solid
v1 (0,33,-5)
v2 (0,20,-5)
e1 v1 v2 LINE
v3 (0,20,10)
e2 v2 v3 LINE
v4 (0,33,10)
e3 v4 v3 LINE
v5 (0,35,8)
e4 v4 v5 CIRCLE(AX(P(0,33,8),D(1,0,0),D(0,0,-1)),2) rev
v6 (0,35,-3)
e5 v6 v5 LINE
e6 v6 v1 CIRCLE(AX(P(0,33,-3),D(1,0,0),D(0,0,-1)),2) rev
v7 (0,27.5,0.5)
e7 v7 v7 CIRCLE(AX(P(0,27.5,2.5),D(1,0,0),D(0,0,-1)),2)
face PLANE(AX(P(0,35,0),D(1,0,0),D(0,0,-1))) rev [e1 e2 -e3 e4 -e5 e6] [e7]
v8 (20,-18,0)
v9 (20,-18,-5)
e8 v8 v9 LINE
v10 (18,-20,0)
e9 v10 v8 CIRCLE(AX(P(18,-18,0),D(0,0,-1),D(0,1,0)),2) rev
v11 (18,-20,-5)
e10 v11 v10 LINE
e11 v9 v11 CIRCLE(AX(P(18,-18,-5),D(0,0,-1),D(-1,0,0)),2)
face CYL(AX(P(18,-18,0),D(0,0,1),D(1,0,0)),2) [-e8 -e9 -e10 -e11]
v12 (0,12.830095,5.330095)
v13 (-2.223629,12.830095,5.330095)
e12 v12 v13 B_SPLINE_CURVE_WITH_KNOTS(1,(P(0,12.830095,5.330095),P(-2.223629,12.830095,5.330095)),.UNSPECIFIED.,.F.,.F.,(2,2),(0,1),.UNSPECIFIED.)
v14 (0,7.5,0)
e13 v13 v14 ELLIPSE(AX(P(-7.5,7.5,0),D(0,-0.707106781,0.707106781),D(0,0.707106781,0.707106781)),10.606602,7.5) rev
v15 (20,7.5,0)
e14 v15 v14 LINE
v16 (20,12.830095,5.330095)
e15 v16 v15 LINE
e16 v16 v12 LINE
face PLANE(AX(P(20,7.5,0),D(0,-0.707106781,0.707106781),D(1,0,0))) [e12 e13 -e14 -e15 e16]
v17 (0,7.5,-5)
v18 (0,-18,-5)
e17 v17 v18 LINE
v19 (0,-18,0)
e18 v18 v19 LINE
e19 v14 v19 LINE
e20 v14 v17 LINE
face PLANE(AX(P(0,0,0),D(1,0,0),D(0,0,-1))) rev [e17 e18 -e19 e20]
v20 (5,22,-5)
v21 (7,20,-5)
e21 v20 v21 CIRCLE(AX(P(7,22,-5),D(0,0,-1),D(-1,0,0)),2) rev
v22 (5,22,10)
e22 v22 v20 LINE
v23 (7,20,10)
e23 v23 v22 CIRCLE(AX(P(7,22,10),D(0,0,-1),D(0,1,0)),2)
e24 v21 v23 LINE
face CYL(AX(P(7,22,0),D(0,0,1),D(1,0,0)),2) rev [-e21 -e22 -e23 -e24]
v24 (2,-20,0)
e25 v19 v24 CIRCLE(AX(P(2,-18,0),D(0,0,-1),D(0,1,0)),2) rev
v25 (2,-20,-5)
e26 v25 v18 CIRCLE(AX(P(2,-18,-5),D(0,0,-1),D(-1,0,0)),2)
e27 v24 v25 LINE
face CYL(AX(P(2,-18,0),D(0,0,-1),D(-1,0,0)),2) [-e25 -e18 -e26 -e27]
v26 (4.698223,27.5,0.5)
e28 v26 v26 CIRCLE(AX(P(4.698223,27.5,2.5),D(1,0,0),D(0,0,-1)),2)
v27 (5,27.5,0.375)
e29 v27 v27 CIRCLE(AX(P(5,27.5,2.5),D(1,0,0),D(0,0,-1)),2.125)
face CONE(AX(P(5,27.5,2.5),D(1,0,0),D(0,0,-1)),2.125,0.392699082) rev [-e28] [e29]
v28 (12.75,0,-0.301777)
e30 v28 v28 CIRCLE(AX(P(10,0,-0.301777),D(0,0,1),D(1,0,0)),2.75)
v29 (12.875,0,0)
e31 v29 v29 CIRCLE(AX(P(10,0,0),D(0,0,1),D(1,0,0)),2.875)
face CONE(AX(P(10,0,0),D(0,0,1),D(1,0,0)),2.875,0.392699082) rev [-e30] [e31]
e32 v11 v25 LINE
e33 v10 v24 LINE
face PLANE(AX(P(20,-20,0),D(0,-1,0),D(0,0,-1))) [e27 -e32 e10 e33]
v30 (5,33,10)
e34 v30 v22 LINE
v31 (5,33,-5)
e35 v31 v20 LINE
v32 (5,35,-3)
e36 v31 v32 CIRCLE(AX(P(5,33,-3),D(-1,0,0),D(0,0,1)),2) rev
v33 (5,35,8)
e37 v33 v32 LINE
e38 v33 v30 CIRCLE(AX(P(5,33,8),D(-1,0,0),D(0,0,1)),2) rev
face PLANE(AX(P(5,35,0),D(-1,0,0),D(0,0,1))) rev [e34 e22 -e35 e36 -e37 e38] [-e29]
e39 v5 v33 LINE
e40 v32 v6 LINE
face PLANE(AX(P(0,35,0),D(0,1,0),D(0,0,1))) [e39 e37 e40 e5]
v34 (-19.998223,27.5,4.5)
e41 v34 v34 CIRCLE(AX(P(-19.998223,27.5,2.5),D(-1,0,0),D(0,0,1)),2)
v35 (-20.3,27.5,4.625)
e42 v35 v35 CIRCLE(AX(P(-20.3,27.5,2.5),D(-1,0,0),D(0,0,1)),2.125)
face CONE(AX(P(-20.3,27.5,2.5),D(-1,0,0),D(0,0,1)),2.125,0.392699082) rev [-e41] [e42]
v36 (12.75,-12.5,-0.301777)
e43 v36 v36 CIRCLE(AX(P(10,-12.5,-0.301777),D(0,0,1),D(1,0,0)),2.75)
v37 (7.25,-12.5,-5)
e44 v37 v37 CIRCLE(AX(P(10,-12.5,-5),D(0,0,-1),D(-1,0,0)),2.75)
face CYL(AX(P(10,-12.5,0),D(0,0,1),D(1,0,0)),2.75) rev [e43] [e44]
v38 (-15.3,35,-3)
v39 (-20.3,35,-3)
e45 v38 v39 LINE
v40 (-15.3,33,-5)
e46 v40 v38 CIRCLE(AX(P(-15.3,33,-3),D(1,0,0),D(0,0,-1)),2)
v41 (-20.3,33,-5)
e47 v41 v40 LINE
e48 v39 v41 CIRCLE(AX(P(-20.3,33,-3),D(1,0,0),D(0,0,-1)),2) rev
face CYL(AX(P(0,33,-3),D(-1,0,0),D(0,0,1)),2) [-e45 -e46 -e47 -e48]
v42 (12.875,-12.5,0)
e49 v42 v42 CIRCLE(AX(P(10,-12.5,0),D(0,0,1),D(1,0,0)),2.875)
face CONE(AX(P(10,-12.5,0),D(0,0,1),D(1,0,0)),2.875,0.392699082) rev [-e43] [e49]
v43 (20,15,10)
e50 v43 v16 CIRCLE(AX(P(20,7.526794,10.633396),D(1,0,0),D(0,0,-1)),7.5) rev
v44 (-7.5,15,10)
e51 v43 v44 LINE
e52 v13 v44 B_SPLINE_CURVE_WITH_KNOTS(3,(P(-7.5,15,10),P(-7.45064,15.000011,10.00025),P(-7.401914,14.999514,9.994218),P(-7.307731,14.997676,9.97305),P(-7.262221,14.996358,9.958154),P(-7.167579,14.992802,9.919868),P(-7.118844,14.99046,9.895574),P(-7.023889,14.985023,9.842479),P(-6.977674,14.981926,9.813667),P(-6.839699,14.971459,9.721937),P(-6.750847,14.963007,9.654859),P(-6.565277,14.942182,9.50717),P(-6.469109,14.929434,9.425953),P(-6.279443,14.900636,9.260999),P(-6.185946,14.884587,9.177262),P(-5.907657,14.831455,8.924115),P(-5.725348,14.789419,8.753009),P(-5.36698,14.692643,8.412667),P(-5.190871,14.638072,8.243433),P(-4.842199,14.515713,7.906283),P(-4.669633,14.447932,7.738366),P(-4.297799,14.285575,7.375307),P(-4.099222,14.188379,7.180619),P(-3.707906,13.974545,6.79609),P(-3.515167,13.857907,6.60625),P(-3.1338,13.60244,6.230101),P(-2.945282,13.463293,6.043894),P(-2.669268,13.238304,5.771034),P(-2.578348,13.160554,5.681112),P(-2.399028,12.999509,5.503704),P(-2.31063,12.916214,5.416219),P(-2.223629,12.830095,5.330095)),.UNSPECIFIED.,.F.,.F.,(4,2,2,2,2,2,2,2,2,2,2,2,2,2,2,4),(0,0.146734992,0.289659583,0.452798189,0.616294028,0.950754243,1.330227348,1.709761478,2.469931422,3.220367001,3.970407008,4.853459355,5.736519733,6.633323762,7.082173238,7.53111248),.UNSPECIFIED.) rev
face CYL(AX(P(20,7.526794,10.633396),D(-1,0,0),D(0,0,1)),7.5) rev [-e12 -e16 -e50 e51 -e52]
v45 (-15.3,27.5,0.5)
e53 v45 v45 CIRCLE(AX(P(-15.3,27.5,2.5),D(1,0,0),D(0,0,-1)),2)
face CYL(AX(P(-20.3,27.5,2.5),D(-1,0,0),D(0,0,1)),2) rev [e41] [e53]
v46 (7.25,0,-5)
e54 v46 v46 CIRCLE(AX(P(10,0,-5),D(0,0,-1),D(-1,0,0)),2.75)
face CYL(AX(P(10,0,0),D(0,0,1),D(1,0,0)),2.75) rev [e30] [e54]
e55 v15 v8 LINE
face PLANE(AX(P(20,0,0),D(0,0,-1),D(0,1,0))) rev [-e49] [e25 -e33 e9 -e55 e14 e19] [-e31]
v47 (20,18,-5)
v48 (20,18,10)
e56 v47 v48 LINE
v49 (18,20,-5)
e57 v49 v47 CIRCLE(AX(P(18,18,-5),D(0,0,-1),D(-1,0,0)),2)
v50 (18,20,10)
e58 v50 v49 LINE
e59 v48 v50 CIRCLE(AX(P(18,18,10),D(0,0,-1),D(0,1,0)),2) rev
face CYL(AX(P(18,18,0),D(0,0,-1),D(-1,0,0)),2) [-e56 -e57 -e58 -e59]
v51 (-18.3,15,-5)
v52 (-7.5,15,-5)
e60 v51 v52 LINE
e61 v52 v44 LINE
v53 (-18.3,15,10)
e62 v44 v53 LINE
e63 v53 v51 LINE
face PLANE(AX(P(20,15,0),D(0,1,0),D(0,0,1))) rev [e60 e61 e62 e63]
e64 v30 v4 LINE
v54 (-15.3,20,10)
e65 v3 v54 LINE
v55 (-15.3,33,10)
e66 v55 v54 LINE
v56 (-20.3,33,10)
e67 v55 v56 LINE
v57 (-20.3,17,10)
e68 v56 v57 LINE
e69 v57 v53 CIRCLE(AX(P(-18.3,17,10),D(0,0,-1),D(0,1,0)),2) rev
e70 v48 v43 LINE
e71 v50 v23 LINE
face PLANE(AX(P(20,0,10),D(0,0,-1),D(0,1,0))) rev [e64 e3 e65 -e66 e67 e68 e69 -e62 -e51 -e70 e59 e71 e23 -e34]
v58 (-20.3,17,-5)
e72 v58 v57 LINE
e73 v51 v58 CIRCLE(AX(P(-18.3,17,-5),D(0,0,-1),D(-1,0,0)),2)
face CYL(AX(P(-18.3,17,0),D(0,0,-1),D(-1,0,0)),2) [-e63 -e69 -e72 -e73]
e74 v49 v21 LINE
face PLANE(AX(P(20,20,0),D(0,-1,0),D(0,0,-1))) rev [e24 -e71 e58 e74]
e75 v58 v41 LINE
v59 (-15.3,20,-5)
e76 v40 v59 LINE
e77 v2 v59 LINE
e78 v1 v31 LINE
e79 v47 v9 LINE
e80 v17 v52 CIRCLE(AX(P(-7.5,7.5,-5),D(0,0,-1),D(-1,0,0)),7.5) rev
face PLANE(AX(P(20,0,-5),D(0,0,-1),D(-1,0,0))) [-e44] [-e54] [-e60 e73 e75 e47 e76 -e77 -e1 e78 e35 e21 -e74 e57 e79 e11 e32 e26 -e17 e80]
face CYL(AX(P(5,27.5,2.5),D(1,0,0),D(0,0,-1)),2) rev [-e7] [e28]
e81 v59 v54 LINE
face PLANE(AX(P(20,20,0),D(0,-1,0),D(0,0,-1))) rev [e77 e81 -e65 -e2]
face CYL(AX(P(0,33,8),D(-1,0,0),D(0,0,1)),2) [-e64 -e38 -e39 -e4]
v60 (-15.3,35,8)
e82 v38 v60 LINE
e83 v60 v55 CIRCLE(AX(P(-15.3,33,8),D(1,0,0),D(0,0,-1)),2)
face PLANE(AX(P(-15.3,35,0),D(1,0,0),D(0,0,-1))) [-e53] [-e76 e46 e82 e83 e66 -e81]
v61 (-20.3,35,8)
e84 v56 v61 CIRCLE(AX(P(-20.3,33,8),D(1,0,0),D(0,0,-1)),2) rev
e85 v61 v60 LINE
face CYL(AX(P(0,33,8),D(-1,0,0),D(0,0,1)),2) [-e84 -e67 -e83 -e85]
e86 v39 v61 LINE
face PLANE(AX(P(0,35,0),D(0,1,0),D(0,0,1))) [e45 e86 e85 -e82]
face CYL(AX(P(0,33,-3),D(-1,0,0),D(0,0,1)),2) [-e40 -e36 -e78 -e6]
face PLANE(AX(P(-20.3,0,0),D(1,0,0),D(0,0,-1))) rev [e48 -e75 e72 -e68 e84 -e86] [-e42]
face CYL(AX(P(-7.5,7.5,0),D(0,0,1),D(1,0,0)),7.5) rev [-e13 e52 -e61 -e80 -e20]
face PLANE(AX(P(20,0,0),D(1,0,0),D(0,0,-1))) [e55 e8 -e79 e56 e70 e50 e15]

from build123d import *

# Parameters (mm, degrees)
SKETCH1_W                           = 10
SKETCH1_H                           = 5
SKETCH1_W_2                         = 5
SKETCH1_H_2                         = 40
BOSS_EXTRUDE1_DEPTH                 = 20
SKETCH3_W                           = 15
SKETCH3_H                           = 5
BOSS_EXTRUDE2_DEPTH                 = 20.3
CHAMFER2_SIZE                       = 7.5
SKETCH4_W                           = 5
SKETCH4_H                           = 15
BOSS_EXTRUDE3_DEPTH                 = 15
FILLET1_R                           = 7.5
F_5_5_5_5_DIAMETER_HOLE1_AT_2_COUNT = 2
F_5_5_5_5_DIAMETER_HOLE1_AT_2_PITCH = 12.5
FILLET2_R                           = 2


with BuildPart() as part:
    # Sketch1 → Boss-Extrude1 (new body)
    with BuildSketch(Plane(origin=(0, 0, 0), x_dir=(0, 0, -1), z_dir=(1, 0, 0))):
        with Locations((-5, 17.5)):
            Rectangle(SKETCH1_W, SKETCH1_H)
        with Locations((2.5, 0)):
            Rectangle(SKETCH1_W_2, SKETCH1_H_2)
    extrude(amount=BOSS_EXTRUDE1_DEPTH)

    # Sketch3 → Boss-Extrude2 (add)
    with BuildSketch(Plane(origin=(0, 0, 0), x_dir=(0, 0, -1), z_dir=(1, 0, 0))):
        with Locations((-2.5, 17.5)):
            Rectangle(SKETCH3_W, SKETCH3_H)
    extrude(amount=-BOSS_EXTRUDE2_DEPTH)

    # Chamfer2
    chamfer2_edges = [part.edges().sort_by_distance(p)[0] for p in [
        (10, 15, 0),
    ]]
    chamfer(chamfer2_edges, length=CHAMFER2_SIZE)

    # Sketch4 → Boss-Extrude3 (add)
    with BuildSketch(Plane(origin=(0, 20, 0), x_dir=(1, 0, 0), z_dir=(0, 1, 0))):
        with Locations((-17.8, -2.5)):
            Rectangle(SKETCH4_W, SKETCH4_H)
        with Locations((2.5, -2.5)):
            Rectangle(SKETCH4_W, SKETCH4_H)
    extrude(amount=BOSS_EXTRUDE3_DEPTH)

    # Fillet1
    # the kernel refuses this fillet: 7.5 mm, written as the material it adds along each edge
    with BuildSketch(Plane(origin=(0, 15, 7.5), x_dir=(0, -0.7071067811865472, -0.7071067811865479), z_dir=(1, 0, 0))) as fillet1_piece_1:
        with BuildLine():
            CenterArc((3.068709481, -7.5), FILLET1_R, 90, 40.155443777)
            Line((-1.767766953, -1.767766953), (0, 0))
            Line((0, 0), (3.068709481, 0))
        make_face()
    extrude(amount=20)
    with BuildSketch(Plane(origin=(0, 15, -5), x_dir=(0, -1, 0), z_dir=(0, 0, 1))) as fillet1_piece_2_section:
        with BuildLine():
            CenterArc((FILLET1_R, -FILLET1_R), FILLET1_R, 90, 90)
            Line((0, -FILLET1_R), (0, 0))
            Line((0, 0), (FILLET1_R, 0))
        make_face()
    fillet1_piece_2 = extrude(amount=31.25, mode=Mode.PRIVATE)
    fillet1_piece_2 = split(fillet1_piece_2, bisect_by=Plane(origin=(0, 8.75, 1.25), z_dir=(0, 0.7071067811865477, -0.7071067811865474)), keep=Keep.TOP, mode=Mode.PRIVATE)
    add(fillet1_piece_2)
    with BuildSketch(Plane(origin=(0, 15, -5), x_dir=(0, -1, 0), z_dir=(0, 0, 1))) as fillet1_piece_3a_section:
        with BuildLine():
            CenterArc((FILLET1_R, -FILLET1_R), FILLET1_R, 90, 90)
            Line((0, -FILLET1_R), (0, 0))
            Line((0, 0), (FILLET1_R, 0))
        make_face()
    fillet1_piece_3a = extrude(amount=31.25, mode=Mode.PRIVATE)
    fillet1_piece_3a = split(fillet1_piece_3a, bisect_by=Plane(origin=(0, 15, 10), z_dir=(0, 0, -1)), keep=Keep.TOP, mode=Mode.PRIVATE)
    fillet1_piece_3a = split(fillet1_piece_3a, bisect_by=Plane(origin=(0, 8.75, 1.25), z_dir=(0, -0.7071067811865477, 0.7071067811865474)), keep=Keep.TOP, mode=Mode.PRIVATE)
    with BuildSketch(Plane(origin=(-7.671773702, 15, 7.5), x_dir=(0, -0.7071067811865472, -0.7071067811865479), z_dir=(1, 0, 0))) as fillet1_piece_3b_section:
        with BuildLine():
            CenterArc((3.068709481, -7.5), FILLET1_R, 90, 40.155443777)
            Line((-1.767766953, -1.767766953), (0, 0))
            Line((0, 0), (3.068709481, 0))
        make_face()
    fillet1_piece_3b = extrude(amount=27.671773702, mode=Mode.PRIVATE)
    fillet1_piece_3b = split(fillet1_piece_3b, bisect_by=Plane(origin=(0, 15, 7.5), z_dir=(-1, 0, 0)), keep=Keep.TOP, mode=Mode.PRIVATE)
    fillet1_piece_3 = fillet1_piece_3a & fillet1_piece_3b
    add(fillet1_piece_3)

    # Sketch9 → Ø5.5 (5.5) Diameter Hole1 (revolve, cut)
    with BuildSketch(Plane(origin=(10, 0, 0), x_dir=(0, -1, 0), z_dir=(1, 0, 0))):
        Polygon((0, 0), (0, 5), (2.75, 5), (2.75, 0.301776695), (2.875, 0), align=None)
    f_5_5_5_5_diameter_hole1 = revolve(axis=Axis((10, 0, 6.35), (0, 0, -1)), mode=Mode.SUBTRACT)

    # Ø5.5 (5.5) Diameter Hole1 at 2: Ø5.5 (5.5) Diameter Hole1 ×2
    with Locations(*[(0, -i * F_5_5_5_5_DIAMETER_HOLE1_AT_2_PITCH, 0) for i in range(1, F_5_5_5_5_DIAMETER_HOLE1_AT_2_COUNT)]):
        add(f_5_5_5_5_diameter_hole1, mode=Mode.SUBTRACT)

    # Sketch12 → Ø4.0 (4) Diameter Hole1 (revolve, cut)
    with BuildSketch(Plane(origin=(-20.3, 27.5, 2.5), x_dir=(0, 0, 1), z_dir=(0, 1, 0))):
        Polygon((0, 0), (0, 5), (2, 5), (2, 0.301776695), (2.125, 0), align=None)
    f_4_0_4_diameter_hole1 = revolve(axis=Axis((-26.65, 27.5, 2.5), (1, 0, 0)), mode=Mode.SUBTRACT)

    # Mirror1: Ø4.0 (4) Diameter Hole1 across plane
    add(f_4_0_4_diameter_hole1.mirror(Plane(origin=(-7.65, 0, 0), x_dir=(0, 0, 1), z_dir=(1, 0, 0))), mode=Mode.SUBTRACT)

    # Fillet2
    fillet2_edges = [part.edges().sort_by_distance(p)[0] for p in [
        (20, -20, -2.5),
        (-20.3, 15, 2.5),
        (20, 20, 2.5),
        (-17.8, 35, -5),
        (-17.8, 35, 10),
        (5, 20, 2.5),
        (2.5, 35, 10),
        (2.5, 35, -5),
        (0, -20, -2.5),
    ]]
    fillet(fillet2_edges, radius=FILLET2_R)


solid = part.part
